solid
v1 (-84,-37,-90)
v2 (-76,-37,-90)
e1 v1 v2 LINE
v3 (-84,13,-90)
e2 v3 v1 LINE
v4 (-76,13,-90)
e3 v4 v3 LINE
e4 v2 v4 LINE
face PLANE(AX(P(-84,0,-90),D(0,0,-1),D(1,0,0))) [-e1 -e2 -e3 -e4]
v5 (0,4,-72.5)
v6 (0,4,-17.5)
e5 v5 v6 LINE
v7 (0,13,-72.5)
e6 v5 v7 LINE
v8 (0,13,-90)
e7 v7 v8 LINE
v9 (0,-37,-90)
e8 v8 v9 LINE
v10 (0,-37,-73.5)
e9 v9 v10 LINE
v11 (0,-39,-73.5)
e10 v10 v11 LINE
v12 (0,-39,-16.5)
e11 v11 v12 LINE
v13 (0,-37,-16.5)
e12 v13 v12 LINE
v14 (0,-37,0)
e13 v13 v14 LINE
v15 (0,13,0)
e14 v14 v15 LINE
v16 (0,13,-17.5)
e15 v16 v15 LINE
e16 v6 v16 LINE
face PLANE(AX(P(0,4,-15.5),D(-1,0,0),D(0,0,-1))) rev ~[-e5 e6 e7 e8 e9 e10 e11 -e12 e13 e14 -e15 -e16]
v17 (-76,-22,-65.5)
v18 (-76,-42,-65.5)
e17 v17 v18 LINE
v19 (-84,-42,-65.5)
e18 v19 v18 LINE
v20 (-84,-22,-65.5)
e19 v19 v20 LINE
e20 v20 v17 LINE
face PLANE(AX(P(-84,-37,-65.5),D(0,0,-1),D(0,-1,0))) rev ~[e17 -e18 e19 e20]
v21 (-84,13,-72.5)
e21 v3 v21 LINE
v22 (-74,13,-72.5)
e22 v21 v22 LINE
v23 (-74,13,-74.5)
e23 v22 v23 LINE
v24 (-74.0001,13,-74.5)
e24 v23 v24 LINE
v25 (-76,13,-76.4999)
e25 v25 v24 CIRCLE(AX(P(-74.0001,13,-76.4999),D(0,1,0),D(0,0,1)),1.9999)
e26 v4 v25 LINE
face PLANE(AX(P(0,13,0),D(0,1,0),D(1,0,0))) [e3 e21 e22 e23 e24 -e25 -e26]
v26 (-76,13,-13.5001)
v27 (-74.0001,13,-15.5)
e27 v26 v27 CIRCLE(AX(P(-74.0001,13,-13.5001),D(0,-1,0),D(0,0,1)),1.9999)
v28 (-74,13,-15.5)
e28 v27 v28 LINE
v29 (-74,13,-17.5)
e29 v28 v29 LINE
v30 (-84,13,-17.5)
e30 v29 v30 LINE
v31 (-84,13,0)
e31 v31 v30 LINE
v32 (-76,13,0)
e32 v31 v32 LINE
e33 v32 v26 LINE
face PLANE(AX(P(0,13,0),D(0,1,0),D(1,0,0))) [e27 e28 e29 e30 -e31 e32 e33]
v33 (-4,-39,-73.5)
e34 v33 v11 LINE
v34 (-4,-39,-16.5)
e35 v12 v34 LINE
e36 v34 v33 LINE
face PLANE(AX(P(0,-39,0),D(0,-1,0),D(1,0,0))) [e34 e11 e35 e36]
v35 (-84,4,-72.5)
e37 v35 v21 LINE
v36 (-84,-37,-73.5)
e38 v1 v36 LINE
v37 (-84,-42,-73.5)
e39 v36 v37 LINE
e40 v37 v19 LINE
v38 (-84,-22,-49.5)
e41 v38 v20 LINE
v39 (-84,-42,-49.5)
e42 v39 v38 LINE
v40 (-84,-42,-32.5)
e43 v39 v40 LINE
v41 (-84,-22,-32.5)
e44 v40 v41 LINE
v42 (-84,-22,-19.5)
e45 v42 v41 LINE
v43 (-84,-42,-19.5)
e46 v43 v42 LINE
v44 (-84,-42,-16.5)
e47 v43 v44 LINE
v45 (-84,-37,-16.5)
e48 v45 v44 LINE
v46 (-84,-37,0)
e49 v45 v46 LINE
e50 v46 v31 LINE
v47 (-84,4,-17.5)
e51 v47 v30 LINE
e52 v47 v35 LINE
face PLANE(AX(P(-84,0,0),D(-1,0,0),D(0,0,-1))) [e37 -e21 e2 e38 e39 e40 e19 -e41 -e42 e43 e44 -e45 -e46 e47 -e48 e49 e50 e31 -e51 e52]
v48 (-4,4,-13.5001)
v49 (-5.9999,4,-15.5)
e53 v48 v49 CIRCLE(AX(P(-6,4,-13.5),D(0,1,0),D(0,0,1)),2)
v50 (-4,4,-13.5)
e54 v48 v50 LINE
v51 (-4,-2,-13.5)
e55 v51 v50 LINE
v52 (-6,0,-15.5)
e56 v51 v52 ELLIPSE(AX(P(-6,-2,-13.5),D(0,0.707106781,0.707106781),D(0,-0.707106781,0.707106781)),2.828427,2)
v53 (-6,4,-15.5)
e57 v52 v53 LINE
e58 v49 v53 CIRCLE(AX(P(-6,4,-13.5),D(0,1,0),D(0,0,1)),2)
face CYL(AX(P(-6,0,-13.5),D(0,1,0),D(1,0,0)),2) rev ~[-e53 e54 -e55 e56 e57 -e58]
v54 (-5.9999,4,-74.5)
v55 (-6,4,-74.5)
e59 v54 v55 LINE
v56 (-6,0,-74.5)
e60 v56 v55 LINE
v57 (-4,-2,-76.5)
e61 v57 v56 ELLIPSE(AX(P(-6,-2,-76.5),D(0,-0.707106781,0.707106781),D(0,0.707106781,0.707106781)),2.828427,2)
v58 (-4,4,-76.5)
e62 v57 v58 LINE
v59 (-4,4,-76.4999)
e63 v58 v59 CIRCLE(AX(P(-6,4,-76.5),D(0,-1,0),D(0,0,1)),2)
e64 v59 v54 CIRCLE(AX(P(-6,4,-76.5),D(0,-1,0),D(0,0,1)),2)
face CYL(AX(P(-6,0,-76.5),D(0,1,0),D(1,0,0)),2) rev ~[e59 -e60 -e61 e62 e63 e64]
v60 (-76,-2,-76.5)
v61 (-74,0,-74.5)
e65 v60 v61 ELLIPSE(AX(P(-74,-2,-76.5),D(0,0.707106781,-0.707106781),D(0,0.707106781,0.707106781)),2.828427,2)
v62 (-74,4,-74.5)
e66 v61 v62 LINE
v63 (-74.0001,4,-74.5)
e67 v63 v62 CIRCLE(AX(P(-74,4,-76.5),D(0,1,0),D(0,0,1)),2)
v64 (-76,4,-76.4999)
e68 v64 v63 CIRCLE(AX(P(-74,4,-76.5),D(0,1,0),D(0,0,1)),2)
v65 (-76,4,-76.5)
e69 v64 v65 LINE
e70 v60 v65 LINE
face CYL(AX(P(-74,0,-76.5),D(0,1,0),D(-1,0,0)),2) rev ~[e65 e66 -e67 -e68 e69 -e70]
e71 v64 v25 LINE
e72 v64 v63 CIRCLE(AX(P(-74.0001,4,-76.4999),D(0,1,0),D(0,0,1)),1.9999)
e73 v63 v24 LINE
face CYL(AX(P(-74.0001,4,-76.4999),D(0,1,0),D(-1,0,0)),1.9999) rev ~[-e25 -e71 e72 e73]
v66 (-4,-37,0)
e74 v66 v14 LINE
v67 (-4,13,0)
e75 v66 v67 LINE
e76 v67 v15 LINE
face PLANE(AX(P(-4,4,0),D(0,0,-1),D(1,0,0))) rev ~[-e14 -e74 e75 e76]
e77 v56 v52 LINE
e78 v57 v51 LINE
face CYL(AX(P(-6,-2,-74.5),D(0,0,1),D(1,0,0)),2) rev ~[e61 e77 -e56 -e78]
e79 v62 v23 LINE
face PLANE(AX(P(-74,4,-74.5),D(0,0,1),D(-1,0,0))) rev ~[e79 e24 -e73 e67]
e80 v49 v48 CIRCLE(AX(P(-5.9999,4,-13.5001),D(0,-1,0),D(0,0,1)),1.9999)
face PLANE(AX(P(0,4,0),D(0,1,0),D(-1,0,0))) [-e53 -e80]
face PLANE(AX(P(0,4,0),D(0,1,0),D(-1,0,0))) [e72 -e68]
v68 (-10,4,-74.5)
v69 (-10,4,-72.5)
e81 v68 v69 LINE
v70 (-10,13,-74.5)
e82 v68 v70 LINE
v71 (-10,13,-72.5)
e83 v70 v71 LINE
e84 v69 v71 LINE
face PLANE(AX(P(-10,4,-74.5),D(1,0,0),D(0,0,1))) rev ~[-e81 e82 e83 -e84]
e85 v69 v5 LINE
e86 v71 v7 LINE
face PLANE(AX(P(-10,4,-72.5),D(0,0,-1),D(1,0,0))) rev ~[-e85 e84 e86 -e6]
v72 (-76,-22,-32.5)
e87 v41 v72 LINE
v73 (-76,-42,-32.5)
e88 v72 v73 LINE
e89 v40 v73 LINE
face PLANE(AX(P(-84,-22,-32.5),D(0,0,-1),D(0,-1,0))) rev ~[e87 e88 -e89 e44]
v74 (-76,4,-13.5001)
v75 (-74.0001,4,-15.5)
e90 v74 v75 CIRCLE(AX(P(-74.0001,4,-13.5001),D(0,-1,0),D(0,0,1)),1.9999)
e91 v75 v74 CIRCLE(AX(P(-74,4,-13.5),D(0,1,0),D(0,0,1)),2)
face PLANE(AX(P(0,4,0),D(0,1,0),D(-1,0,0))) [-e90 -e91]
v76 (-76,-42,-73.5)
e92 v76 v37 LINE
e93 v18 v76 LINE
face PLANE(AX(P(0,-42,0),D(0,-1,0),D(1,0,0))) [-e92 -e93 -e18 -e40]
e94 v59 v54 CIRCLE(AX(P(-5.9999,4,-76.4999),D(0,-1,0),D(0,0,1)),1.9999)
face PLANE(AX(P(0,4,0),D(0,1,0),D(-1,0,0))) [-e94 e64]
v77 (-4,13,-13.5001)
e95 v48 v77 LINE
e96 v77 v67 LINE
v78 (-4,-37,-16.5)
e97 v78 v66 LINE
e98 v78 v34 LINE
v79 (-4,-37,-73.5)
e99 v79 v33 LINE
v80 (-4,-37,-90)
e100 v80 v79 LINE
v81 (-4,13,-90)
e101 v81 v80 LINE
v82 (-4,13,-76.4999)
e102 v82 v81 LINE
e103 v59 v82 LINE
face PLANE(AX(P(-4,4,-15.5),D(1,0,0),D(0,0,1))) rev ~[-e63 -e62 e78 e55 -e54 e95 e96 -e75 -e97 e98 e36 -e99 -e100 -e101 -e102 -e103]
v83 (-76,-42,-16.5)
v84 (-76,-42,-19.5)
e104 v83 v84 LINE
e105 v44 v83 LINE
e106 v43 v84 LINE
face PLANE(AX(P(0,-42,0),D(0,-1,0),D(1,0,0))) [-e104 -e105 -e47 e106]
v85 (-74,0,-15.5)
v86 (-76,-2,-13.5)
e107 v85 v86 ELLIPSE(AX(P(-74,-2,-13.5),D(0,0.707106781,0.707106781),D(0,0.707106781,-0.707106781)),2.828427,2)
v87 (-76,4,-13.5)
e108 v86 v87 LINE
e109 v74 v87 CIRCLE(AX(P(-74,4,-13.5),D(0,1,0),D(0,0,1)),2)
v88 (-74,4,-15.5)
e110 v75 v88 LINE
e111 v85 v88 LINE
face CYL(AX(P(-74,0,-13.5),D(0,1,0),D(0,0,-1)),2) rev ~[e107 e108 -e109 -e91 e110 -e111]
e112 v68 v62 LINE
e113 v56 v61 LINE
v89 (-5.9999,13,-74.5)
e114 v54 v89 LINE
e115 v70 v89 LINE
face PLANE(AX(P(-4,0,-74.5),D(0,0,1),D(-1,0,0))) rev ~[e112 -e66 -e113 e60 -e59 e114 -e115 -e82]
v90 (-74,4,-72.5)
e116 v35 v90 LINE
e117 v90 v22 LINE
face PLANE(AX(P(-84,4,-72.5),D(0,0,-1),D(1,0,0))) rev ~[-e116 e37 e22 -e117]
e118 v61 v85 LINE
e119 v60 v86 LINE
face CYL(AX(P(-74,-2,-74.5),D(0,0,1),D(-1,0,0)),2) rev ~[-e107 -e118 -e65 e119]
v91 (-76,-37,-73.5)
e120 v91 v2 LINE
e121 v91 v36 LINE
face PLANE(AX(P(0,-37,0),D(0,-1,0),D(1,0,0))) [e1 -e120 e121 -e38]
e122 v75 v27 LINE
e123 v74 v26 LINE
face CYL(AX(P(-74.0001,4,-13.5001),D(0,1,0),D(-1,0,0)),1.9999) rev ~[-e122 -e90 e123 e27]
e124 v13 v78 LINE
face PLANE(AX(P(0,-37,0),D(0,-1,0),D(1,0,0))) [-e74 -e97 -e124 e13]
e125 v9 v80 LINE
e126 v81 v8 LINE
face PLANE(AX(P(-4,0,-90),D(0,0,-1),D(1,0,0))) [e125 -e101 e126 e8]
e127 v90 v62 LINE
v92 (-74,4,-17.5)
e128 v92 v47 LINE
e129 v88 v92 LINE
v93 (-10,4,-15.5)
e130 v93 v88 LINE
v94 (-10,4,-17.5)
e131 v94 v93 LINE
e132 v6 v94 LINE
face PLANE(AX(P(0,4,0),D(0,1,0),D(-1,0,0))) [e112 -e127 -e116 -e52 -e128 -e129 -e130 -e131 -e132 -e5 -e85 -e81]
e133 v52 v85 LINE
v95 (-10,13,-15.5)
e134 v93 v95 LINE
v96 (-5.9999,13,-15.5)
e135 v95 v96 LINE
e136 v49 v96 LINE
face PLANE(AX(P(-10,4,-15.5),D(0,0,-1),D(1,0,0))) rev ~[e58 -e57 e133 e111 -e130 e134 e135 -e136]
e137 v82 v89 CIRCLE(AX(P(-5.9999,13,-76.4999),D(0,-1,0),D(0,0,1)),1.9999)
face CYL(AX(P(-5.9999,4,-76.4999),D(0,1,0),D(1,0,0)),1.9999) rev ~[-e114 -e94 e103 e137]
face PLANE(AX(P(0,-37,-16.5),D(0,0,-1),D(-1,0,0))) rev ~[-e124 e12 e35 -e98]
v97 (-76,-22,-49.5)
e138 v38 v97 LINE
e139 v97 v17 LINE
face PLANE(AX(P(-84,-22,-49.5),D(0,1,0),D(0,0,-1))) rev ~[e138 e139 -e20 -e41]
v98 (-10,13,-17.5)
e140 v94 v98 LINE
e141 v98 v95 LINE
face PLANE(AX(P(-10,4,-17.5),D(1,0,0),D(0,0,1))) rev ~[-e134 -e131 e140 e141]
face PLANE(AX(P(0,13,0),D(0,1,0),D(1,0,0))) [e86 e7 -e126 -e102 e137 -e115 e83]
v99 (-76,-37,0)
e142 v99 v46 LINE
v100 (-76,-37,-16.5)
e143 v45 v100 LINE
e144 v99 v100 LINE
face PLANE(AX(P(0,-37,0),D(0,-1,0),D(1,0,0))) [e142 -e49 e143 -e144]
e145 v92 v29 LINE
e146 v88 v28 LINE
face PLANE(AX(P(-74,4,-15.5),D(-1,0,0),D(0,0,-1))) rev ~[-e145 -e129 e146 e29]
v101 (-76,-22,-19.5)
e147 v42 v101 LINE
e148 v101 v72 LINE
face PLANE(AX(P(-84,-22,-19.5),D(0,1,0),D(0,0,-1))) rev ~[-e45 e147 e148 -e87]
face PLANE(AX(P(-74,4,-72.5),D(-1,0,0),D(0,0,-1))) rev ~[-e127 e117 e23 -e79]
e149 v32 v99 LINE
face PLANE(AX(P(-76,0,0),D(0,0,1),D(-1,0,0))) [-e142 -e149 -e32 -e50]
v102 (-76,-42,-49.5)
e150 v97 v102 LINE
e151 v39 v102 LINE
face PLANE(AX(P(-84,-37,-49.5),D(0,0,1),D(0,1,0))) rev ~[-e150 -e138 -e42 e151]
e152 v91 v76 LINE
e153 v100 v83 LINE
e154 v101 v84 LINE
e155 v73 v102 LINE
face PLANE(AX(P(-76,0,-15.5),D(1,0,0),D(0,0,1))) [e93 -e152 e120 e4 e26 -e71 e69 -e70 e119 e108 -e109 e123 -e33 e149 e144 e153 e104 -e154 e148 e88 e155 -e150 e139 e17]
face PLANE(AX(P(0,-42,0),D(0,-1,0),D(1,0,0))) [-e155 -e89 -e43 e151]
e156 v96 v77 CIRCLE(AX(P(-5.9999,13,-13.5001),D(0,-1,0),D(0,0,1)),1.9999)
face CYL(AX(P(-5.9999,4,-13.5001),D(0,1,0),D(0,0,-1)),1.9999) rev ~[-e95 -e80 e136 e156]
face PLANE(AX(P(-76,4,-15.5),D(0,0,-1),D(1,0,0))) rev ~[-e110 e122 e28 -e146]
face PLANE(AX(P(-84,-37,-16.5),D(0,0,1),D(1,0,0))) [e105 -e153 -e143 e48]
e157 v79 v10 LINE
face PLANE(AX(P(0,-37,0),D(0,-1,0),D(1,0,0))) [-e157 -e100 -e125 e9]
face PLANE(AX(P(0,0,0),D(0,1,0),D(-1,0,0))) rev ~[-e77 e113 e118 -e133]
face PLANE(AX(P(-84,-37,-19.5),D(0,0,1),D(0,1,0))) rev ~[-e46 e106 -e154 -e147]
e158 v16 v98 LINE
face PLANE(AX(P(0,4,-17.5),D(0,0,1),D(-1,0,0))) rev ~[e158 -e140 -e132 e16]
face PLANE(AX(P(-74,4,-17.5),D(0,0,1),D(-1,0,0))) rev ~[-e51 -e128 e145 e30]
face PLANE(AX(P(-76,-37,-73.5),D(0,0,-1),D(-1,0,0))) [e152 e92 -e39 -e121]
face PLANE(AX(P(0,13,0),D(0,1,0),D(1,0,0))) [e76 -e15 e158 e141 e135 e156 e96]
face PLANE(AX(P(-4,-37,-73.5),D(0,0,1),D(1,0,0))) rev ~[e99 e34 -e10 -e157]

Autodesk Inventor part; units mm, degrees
ref_plane "YZ Plane" through (0, 0, 0) normal (1, 0, 0) x (0, 1, 0)
ref_plane "XZ Plane" through (0, 0, 0) normal (0, 1, 0) x (-1, 0, 0)
ref_plane "XY Plane" through (0, 0, 0) normal (0, 0, 1) x (1, 0, 0)
sketch "Sketch1" plane through (0, 0, 0) normal (0, 1, 0) x (-1, 0, 0)
  line L0 (0, 0) -> (84, 0)
  line L1 (84, 0) -> (84, -90)
  line L2 (84, -90) -> (0, -90)
  line L3 (0, -90) -> (0, 0)
  line L4 (84, 0) -> (76, 0)
  line L5 (76, 0) -> (4, 0)
  line L6 (4, 0) -> (4, -15.5)
  line L7 (4, -15.5) -> (76, -15.5)
  line L8 (76, -15.5) -> (76, 0)
  line L9 (84, -45) -> (0, -45) construction
  line L10 (4, -90) -> (4, -74.5)
  line L11 (4, -74.5) -> (76, -74.5)
  line L12 (76, -74.5) -> (76, -90)
  point P0 (4, 0)
  point P1 (4, -90)
  dimension "d0" = 84
  dimension "d1" = 90
  dimension "d4" = 8
  dimension "d5" = 72
  dimension "d6" = 15.5
extrude "Extrusion1" add sketch "Sketch1" along normal blind 4 contours L0 L6 L7 L8 L1 L2 L12 L11 L10 L3
sketch "Sketch2" plane through (0, 0, 0) normal (0, -1, 0) x (1, 0, 0)
  line L0 (-84, -90) -> (-84, 0) projected
  line L1 (-76, 0) -> (-76, -15.5) projected
  line L2 (-84, -90) -> (-76, -90)
  line L3 (-76, -90) -> (-76, 0)
  line L4 (-76, 0) -> (-84, 0)
  line L5 (-84, 0) -> (-84, -90)
  line L6 (0, -90) -> (0, 0)
  line L7 (0, 0) -> (0, -90) projected
  line L8 (-4, 0) -> (0, 0) projected
  line L9 (0, -90) -> (-4, -90)
  line L10 (-4, -90) -> (-4, 0)
  line L11 (-4, 0) -> (0, 0)
  line L12 (0, 0) -> (0, -90)
  dimension "d12" = 4
extrude "Extrusion2" add sketch "Sketch2" along normal blind 37
sketch "Sketch3" plane through (0, -37, 0) normal (0, -1, 0) x (1, 0, 0)
  line L0 (-76, -74.5) -> (-76, -90) projected
  line L1 (-76, -74.5) -> (-76, -73.5)
  line L2 (-76, -15.5) -> (-76, -74.5) projected
  line L3 (-76, -73.5) -> (-84, -73.5)
  line L4 (-84, -73.5) -> (-84, -16.5)
  line L5 (-84, -16.5) -> (-76, -16.5)
  line L6 (-76, -16.5) -> (-76, -73.5)
  point P0 (0, 0)
  dimension "d17" = 1
  dimension "d18" = 8
  dimension "d19" = 57
extrude "Extrusion3" add sketch "Sketch3" along normal blind 5
sketch "Sketch5" plane through (0, -37, 0) normal (0, -1, 0) x (1, 0, 0)
  line L0 (-4, -74.5) -> (-4, -73.5)
  line L1 (-4, -73.5) -> (-4, -73.5) construction
  line L2 (-4, 0) -> (-4, -90) projected
  line L3 (-4, -73.5) -> (0, -73.5)
  line L4 (0, -73.5) -> (0, -16.5)
  line L5 (0, -16.5) -> (-4, -16.5)
  line L6 (-4, -16.5) -> (-4, -73.5)
  point P0 (0, 0)
  dimension "d20" = 1
  dimension "d21" = 4
  dimension "d22" = 57
extrude "Extrusion4" add sketch "Sketch5" along normal blind 2
fillet "Fillet1" radius 2 6 edges at (-76, 2, -15.5) (-76, 0, -45) (-76, 2, -74.5) (-4, 2, -74.5) (-4, 0, -45) (-4, 2, -15.5)
sketch "Sketch6" plane through (0, 4, 0) normal (0, 1, 0) x (1, 0, 0)
  line L0 (-6, 74.5) -> (-74, 74.5) projected
  line L1 (-26.2554, 74.5) -> (0, 74.5) construction
  line L2 (0, 74.5) -> (-10, 74.5)
  line L3 (-10, 74.5) -> (-10, 72.5)
  line L4 (-10, 72.5) -> (0, 72.5)
  line L5 (0, 72.5) -> (0, 74.5)
  line L6 (-100.2554, 74.5) -> (-74, 74.5) construction
  line L7 (-84, 74.5) -> (-84, 72.5)
  line L8 (-84, 72.5) -> (-74, 72.5)
  line L9 (-74, 74.5) -> (-84, 74.5)
  line L10 (-74, 72.5) -> (-74, 74.5)
  line L11 (-26.2554, 17.5) -> (0, 17.5) construction
  line L12 (-10, 17.5) -> (-10, 15.5)
  line L13 (-10, 15.5) -> (0, 15.5)
  line L14 (0, 17.5) -> (-10, 17.5)
  line L15 (0, 15.5) -> (0, 17.5)
  line L16 (-100.2554, 17.5) -> (-74, 17.5) construction
  line L17 (-84, 17.5) -> (-84, 15.5)
  line L18 (-84, 15.5) -> (-74, 15.5)
  line L19 (-74, 17.5) -> (-84, 17.5)
  line L20 (-74, 15.5) -> (-74, 17.5)
  line L21 (-84, 0) -> (-76, 0) projected
  line L22 (-84, 0) -> (-76, 0)
  line L23 (-76, 0) -> (-76, 15.5)
  line L24 (-76, 15.5) -> (-84, 15.5)
  line L25 (-84, 15.5) -> (-84, 0)
  line L26 (-76, 76.5) -> (-76, 90) projected
  line L27 (-76, 90) -> (-84, 90)
  line L28 (-84, 90) -> (-84, 74.5)
  line L29 (-84, 74.5) -> (-76, 74.5)
  line L30 (-76, 74.5) -> (-76, 90)
  line L31 (-4, 90) -> (-4, 76.5) projected
  line L32 (-4, 90) -> (0, 90)
  line L33 (0, 90) -> (0, 74.5)
  line L34 (0, 74.5) -> (-4, 74.5)
  line L35 (-4, 74.5) -> (-4, 90)
  line L36 (-4, 0) -> (0, 0) projected
  line L37 (-4, 0) -> (0, 0)
  line L38 (0, 0) -> (0, 15.5)
  line L39 (0, 15.5) -> (-4, 15.5)
  line L40 (-4, 15.5) -> (-4, 0)
  dimension "d26" = 10
  dimension "d27" = 2
  dimension "d30" = 74
  dimension "d33" = 57
extrude "Extrusion5" add sketch "Sketch6" along normal blind 9
fillet "Fillet2" radius 2 4 edges at (-76, 8.5, -15.5) (-4, 8.5, -15.5) (-4, 8.5, -74.5) (-76, 8.5, -74.5)
sketch "Sketch8" plane through (-84, -42, -73.5) normal (-1, 0, 0) x (0, 0, 1)
  line L0 (-16.5, 5) -> (-16.5, 55) projected
  line L1 (-16.5, 5) -> (8, 5)
  line L2 (0, 3) -> (57, 3) projected
  line L3 (-16.5, 5) -> (8, 5) construction
  line L4 (24, 5) -> (24, 20)
  line L5 (24, 20) -> (8, 20)
  line L6 (8, 20) -> (8, 5)
  line L7 (57, 0) -> (0, 0) projected
  line L8 (8, 5) -> (8, 0)
  line L9 (8, 0) -> (24, 0)
  line L10 (24, 0) -> (24, 5)
  line L11 (73.5, 5) -> (73.5, 55) projected
  line L12 (73.5, 5) -> (54, 5)
  line L13 (54, 5) -> (54, 20)
  line L14 (54, 20) -> (73.5, 20)
  line L15 (73.5, 20) -> (73.5, 5)
  line L16 (54, 20) -> (41, 20)
  line L17 (41, 20) -> (41, 0)
  line L18 (41, 0) -> (54, 0)
  line L19 (54, 0) -> (54, 20)
  point P0 (73.5, 42)
  dimension "d39" = 24.5
  dimension "d40" = 0
  dimension "d41" = 16
  dimension "d42" = 15
  dimension "d44" = 19.5
  dimension "d45" = 15
  dimension "d46" = 13
extrude "Extrusion6" cut sketch "Sketch8" against normal up to surface (8 mm away) contours L8 L6 L5 L4 L10 L2 | L2 L10 L7 L8 | L17 L16 L13 L19 L2 | L2 L19 L7 L17
properties part number "Breadboard_insert"
